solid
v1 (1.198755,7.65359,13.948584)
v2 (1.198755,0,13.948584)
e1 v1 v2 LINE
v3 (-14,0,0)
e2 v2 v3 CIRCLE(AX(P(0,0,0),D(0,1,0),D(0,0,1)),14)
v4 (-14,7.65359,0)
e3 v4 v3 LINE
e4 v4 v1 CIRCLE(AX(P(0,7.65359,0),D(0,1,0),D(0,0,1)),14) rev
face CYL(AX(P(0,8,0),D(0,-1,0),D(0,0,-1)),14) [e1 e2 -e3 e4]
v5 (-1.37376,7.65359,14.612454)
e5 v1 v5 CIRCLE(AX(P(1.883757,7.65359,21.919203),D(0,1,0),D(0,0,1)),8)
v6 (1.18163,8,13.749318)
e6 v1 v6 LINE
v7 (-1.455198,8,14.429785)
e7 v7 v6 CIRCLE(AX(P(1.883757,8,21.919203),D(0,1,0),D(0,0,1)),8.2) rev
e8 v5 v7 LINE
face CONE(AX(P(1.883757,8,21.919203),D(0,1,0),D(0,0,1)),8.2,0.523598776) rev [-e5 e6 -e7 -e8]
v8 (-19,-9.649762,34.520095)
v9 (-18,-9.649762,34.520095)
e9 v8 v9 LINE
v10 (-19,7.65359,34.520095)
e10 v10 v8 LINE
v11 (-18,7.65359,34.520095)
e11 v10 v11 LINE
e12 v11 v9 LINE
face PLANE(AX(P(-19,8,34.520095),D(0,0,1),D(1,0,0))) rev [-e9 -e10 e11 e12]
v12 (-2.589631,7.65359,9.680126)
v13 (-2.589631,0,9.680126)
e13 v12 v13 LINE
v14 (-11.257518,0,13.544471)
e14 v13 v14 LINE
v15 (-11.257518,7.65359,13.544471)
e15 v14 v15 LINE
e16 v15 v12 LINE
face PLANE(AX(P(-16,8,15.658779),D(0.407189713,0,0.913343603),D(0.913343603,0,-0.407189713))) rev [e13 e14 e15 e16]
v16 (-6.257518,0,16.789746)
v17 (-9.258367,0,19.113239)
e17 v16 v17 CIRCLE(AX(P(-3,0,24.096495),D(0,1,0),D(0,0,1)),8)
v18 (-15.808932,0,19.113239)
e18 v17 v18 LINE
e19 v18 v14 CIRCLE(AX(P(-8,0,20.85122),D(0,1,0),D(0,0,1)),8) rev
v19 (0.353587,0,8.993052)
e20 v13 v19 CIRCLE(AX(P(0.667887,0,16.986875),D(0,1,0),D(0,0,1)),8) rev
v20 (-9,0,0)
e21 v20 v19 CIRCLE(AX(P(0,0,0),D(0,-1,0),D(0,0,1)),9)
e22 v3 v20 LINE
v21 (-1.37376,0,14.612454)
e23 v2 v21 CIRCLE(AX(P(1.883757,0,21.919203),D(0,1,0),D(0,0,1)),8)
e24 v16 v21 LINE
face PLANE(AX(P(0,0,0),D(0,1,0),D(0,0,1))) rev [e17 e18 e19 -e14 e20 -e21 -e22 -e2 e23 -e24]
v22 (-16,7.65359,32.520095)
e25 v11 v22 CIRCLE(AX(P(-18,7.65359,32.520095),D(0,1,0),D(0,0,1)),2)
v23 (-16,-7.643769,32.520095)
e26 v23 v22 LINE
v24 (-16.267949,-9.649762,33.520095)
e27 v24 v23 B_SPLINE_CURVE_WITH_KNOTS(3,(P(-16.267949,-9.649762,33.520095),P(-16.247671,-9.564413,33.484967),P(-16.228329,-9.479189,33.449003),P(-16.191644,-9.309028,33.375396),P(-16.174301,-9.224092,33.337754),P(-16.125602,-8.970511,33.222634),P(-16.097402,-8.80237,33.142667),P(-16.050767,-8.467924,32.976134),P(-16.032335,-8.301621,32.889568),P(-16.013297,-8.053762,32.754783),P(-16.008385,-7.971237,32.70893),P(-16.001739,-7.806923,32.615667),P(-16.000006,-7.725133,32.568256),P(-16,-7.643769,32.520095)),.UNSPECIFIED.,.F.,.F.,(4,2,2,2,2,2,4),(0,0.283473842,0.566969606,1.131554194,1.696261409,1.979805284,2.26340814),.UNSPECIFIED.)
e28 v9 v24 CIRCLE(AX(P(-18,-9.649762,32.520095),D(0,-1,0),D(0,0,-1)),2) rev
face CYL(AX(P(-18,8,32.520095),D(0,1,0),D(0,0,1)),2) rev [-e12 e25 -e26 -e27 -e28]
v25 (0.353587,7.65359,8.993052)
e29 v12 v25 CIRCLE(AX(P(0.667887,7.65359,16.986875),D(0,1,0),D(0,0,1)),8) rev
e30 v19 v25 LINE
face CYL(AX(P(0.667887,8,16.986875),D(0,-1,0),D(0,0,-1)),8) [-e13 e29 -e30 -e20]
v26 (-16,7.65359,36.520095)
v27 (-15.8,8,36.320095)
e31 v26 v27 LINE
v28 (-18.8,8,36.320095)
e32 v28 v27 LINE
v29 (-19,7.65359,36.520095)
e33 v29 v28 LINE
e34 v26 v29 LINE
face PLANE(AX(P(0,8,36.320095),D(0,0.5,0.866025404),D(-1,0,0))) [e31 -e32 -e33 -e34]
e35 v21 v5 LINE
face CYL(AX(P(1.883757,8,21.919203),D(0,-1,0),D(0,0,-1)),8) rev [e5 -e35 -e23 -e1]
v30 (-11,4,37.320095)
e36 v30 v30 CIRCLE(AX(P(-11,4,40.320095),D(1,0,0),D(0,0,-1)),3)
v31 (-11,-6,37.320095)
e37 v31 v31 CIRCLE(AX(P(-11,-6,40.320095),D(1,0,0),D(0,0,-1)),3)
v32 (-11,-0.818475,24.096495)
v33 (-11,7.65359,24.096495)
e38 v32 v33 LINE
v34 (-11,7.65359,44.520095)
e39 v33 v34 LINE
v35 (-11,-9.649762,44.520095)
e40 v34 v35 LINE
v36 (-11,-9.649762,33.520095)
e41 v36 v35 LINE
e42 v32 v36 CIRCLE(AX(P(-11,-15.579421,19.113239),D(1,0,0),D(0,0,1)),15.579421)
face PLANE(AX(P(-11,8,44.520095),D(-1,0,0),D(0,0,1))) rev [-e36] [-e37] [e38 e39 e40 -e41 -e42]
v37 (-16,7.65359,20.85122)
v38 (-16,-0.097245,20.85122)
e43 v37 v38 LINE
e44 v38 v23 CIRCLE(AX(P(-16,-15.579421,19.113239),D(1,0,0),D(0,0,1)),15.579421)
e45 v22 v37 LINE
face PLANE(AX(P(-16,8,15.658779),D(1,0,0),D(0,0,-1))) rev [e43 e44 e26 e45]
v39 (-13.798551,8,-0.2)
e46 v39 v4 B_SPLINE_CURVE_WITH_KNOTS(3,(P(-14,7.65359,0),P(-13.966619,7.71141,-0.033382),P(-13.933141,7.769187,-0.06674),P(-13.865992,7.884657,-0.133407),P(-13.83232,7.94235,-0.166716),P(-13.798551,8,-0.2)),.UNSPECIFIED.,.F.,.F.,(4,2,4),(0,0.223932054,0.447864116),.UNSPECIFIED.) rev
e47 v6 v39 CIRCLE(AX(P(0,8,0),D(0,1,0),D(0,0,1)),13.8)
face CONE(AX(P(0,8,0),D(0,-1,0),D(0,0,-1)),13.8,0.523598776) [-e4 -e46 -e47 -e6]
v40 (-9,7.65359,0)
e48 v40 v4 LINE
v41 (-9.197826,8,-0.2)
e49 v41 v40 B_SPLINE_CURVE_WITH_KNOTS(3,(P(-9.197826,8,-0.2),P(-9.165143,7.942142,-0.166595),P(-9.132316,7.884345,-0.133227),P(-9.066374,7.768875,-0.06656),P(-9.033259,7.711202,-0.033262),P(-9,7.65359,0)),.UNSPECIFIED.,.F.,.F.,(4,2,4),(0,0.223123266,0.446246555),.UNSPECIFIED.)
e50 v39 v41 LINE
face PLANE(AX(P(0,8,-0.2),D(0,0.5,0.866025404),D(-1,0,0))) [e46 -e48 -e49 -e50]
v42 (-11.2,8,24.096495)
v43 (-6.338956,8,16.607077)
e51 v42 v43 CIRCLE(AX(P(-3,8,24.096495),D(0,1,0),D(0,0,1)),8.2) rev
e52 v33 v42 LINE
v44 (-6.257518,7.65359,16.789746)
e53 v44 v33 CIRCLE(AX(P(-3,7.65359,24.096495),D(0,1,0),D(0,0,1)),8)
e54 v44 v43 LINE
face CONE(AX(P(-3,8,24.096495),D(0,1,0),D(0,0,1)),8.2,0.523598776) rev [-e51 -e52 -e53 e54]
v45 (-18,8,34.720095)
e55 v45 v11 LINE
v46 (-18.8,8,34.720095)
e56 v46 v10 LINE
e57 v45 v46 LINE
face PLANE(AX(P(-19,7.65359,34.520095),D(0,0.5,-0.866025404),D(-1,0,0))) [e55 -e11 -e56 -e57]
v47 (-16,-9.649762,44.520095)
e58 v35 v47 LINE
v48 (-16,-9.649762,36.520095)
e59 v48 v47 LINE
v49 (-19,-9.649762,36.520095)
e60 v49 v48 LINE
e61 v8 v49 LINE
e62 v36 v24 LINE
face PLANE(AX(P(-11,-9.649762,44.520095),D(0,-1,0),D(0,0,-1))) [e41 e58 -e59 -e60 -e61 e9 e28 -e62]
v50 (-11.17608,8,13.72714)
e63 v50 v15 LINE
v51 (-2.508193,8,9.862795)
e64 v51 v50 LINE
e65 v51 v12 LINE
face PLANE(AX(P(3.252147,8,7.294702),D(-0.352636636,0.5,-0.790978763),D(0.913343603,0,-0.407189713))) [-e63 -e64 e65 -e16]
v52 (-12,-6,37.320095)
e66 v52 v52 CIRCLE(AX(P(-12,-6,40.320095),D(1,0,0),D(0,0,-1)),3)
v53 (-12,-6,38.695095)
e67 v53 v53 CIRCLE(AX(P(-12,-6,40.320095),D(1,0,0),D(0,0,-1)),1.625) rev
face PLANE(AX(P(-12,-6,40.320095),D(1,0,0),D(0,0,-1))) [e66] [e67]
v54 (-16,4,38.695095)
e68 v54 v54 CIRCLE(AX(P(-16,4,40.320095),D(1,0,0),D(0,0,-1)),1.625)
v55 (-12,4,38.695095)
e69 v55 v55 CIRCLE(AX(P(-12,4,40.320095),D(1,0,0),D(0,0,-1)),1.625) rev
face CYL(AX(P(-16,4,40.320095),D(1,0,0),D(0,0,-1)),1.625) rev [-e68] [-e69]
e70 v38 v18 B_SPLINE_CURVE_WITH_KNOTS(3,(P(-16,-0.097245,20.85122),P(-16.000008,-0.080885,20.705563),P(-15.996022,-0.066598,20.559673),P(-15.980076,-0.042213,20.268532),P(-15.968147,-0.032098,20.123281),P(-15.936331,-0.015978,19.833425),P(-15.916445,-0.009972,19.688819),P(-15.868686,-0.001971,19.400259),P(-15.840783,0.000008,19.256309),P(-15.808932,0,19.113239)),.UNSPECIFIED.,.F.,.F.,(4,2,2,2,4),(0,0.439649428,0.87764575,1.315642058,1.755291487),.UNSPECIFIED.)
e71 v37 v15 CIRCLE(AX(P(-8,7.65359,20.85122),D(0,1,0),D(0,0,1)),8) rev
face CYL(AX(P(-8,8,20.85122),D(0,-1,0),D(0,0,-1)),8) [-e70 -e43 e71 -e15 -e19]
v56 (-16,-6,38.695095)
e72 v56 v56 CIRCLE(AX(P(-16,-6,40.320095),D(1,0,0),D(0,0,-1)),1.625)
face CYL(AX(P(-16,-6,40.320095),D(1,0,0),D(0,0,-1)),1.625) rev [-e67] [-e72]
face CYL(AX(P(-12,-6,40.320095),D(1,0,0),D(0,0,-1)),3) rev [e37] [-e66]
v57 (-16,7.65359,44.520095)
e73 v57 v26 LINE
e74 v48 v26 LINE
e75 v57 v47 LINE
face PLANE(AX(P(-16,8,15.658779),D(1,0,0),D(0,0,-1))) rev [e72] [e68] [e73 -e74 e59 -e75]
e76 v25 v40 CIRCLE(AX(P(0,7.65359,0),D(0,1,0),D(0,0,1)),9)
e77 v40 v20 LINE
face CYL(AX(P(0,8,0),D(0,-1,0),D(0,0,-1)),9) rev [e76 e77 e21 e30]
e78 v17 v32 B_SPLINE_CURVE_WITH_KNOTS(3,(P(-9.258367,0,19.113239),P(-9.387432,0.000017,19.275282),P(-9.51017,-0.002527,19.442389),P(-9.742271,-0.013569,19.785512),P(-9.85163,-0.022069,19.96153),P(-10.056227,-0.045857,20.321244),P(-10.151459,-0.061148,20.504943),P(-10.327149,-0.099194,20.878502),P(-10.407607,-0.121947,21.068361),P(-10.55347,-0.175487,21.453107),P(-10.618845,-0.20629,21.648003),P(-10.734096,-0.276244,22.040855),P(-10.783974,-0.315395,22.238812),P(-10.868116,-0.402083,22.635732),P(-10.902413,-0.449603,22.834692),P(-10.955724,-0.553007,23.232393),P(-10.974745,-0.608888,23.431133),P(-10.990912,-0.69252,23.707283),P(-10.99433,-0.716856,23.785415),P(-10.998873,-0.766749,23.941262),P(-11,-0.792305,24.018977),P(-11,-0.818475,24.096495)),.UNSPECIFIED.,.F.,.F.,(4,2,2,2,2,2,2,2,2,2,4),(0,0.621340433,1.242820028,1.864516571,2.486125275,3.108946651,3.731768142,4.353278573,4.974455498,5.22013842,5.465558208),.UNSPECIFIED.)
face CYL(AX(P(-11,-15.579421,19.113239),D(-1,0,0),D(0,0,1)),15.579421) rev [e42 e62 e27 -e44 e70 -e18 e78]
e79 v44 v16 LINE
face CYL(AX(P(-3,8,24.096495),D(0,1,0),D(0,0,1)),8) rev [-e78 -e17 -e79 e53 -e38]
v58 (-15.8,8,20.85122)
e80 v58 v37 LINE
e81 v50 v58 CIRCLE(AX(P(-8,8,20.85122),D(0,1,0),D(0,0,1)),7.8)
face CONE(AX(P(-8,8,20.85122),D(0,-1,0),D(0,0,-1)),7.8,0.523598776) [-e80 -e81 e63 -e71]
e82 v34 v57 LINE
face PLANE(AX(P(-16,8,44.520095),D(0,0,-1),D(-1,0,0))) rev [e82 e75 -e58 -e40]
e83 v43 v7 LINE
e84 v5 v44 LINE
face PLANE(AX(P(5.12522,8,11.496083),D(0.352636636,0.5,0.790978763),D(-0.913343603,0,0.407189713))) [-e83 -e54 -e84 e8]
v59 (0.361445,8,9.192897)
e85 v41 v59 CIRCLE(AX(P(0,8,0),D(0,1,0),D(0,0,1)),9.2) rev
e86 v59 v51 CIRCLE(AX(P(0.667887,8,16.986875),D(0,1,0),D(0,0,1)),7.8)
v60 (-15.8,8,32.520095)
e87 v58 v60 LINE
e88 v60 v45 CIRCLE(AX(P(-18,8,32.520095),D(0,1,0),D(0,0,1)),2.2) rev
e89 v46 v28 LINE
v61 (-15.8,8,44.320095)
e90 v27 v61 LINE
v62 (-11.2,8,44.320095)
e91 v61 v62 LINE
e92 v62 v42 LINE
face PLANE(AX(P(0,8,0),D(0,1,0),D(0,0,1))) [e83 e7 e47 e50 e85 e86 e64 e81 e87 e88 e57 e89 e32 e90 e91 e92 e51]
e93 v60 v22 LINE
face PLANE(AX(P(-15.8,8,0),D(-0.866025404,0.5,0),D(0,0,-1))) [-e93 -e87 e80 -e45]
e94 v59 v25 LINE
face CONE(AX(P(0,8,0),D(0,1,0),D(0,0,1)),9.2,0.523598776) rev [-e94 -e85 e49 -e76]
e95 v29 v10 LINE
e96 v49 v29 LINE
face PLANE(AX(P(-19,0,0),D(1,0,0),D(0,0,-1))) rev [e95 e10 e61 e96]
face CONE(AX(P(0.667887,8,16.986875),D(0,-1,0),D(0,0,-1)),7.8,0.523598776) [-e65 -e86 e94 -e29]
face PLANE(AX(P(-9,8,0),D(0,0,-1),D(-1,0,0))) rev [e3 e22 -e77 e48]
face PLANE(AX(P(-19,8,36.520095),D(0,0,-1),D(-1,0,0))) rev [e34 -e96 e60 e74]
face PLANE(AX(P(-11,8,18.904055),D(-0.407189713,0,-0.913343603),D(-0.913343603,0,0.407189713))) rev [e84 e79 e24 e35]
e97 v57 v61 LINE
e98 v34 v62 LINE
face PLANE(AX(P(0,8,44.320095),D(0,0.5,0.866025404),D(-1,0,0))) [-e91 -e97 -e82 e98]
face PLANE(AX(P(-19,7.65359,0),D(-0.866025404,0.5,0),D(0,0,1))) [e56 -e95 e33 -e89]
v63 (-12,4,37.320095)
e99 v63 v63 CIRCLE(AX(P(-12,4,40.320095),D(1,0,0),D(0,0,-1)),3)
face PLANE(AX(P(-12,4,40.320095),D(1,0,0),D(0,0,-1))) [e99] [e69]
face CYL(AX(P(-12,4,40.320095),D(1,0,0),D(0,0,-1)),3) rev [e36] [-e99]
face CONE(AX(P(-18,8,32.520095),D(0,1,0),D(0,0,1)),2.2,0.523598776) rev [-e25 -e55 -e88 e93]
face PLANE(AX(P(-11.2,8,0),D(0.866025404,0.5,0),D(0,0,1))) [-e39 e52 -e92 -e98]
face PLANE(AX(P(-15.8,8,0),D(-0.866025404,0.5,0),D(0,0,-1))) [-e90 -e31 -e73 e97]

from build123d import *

# Parameters (mm, degrees)
BOSS_EXTRUDE1_DEPTH = 8
BOSS_EXTRUDE2_DEPTH = 5
FILLET1_R           = 8
SKETCH3_R           = 1.625
CUT_EXTRUDE1_DEPTH  = 52.963032648
SKETCH4_R           = 3
CUT_EXTRUDE2_DEPTH  = 1
SKETCH5_W           = 2
SKETCH5_H           = 17.649761518
BOSS_EXTRUDE3_DEPTH = 3
FILLET2_R           = 2
CHAMFER1_SIZE       = 0.2
CHAMFER1_SIZE2      = 0.346410162


with BuildPart() as part:
    # Sketch1 → Boss-Extrude1 (new body)
    with BuildSketch(Plane(origin=(0, 0, 0), x_dir=(1, 0, 0), z_dir=(0, 1, 0))):
        with BuildLine():
            Line((-16, -15.658779245), (-16, -44.520095044))
            Line((-16, -44.520095044), (-11, -44.520095044))
            Line((-11, -44.520095044), (-11, -18.904054542))
            Line((-11, -18.904054542), (0, -14))
            ThreePointArc((0, -14), (9.899494937, 9.899494937), (-14, 0))
            Line((-14, 0), (-9, 0))
            ThreePointArc((-9, 0), (6.691765492, 6.018328223), (-0.951050089, -8.949609138))
            Line((-0.951050089, -8.949609138), (-16, -15.658779245))
        make_face()
    extrude(amount=BOSS_EXTRUDE1_DEPTH)

    # Sketch2 → Boss-Extrude2 (add)
    with BuildSketch(Plane.ZY.offset(16)):
        with BuildLine():
            Line((44.520095044, 0), (44.520095044, -9.649761518))
            Line((44.520095044, -9.649761518), (33.520095044, -9.649761518))
            ThreePointArc((33.520095044, -9.649761518), (27.783236203, -2.635329296), (19.113239186, 0))
            Line((19.113239186, 0), (44.520095044, 0))
        make_face()
    extrude(amount=-BOSS_EXTRUDE2_DEPTH)

    # Fillet1
    fillet1_edges = [part.edges().sort_by_distance(p)[0] for p in [
        (0, 4, 14),
        (-11, 4, 18.904054542),
    ]]
    fillet(fillet1_edges, radius=FILLET1_R)
    fillet1_2_edges = [part.edges().sort_by_distance(p)[0] for p in [
        (-0.951050089, 4, 8.949609138),
        (-16, 4, 15.658779245),
    ]]
    fillet(fillet1_2_edges, radius=FILLET1_R)

    # Sketch3 → Cut-Extrude1 (cut, through all)
    with BuildSketch(Plane(origin=(-11, 0, 0), x_dir=(0, 0, -1), z_dir=(1, 0, 0))):
        with Locations((-40.320095044, 4)):
            Circle(SKETCH3_R)
        with Locations((-40.320095044, -6)):
            Circle(SKETCH3_R)
    extrude(amount=-CUT_EXTRUDE1_DEPTH, mode=Mode.SUBTRACT)

    # Sketch4 → Cut-Extrude2 (cut)
    with BuildSketch(Plane(origin=(-11, 0, 0), x_dir=(0, 0, -1), z_dir=(1, 0, 0))):
        with Locations((-40.320095044, 4)):
            Circle(SKETCH4_R)
        with Locations((-40.320095044, -6)):
            Circle(SKETCH4_R)
    extrude(amount=-CUT_EXTRUDE2_DEPTH, mode=Mode.SUBTRACT)

    # Sketch5 → Boss-Extrude3 (add)
    with BuildSketch(Plane.ZY.offset(16)):
        with Locations((35.520095044, -0.824880759)):
            Rectangle(SKETCH5_W, SKETCH5_H)
    extrude(amount=BOSS_EXTRUDE3_DEPTH)

    # Fillet2
    fillet2_edges = [part.edges().sort_by_distance(p)[0] for p in [
        (-16, -0.824880759, 34.520095044),
    ]]
    fillet(fillet2_edges, radius=FILLET2_R)

    # Chamfer1
    chamfer1_edges = [part.edges().sort_by_distance(p)[0] for p in [
        (-16.585786438, 8, 33.934308606),
        (-11.5, 8, 0),
        (6.237696494, 8, -6.48776868),
        (-13.5, 8, 44.520095044),
        (-6.923574229, 8, 11.612298605),
        (-11, 8, 34.308295031),
        (-3.815638997, 8, 15.70110016),
        (9.46618809, 8, -10.314615022),
        (-16, 8, 26.685657382),
        (-14.710444905, 8, 16.495771504),
        (-1.150763069, 8, 9.19633523),
        (-0.11525428, 8, 14.172981147),
        (-9.710444905, 8, 19.741046801),
        (-16, 8, 40.520095044),
        (-17.5, 8, 36.520095044),
        (-18.5, 8, 34.520095044),
        (-19, 8, 35.520095044),
    ]]
    chamfer1_side = [part.faces().sort_by_distance(p)[0] for p in [
        (-15.328166574, 8, 26.685657382),
    ]]
    chamfer(chamfer1_edges, length=CHAMFER1_SIZE, length2=CHAMFER1_SIZE2, reference=chamfer1_side[0])


solid = part.part
